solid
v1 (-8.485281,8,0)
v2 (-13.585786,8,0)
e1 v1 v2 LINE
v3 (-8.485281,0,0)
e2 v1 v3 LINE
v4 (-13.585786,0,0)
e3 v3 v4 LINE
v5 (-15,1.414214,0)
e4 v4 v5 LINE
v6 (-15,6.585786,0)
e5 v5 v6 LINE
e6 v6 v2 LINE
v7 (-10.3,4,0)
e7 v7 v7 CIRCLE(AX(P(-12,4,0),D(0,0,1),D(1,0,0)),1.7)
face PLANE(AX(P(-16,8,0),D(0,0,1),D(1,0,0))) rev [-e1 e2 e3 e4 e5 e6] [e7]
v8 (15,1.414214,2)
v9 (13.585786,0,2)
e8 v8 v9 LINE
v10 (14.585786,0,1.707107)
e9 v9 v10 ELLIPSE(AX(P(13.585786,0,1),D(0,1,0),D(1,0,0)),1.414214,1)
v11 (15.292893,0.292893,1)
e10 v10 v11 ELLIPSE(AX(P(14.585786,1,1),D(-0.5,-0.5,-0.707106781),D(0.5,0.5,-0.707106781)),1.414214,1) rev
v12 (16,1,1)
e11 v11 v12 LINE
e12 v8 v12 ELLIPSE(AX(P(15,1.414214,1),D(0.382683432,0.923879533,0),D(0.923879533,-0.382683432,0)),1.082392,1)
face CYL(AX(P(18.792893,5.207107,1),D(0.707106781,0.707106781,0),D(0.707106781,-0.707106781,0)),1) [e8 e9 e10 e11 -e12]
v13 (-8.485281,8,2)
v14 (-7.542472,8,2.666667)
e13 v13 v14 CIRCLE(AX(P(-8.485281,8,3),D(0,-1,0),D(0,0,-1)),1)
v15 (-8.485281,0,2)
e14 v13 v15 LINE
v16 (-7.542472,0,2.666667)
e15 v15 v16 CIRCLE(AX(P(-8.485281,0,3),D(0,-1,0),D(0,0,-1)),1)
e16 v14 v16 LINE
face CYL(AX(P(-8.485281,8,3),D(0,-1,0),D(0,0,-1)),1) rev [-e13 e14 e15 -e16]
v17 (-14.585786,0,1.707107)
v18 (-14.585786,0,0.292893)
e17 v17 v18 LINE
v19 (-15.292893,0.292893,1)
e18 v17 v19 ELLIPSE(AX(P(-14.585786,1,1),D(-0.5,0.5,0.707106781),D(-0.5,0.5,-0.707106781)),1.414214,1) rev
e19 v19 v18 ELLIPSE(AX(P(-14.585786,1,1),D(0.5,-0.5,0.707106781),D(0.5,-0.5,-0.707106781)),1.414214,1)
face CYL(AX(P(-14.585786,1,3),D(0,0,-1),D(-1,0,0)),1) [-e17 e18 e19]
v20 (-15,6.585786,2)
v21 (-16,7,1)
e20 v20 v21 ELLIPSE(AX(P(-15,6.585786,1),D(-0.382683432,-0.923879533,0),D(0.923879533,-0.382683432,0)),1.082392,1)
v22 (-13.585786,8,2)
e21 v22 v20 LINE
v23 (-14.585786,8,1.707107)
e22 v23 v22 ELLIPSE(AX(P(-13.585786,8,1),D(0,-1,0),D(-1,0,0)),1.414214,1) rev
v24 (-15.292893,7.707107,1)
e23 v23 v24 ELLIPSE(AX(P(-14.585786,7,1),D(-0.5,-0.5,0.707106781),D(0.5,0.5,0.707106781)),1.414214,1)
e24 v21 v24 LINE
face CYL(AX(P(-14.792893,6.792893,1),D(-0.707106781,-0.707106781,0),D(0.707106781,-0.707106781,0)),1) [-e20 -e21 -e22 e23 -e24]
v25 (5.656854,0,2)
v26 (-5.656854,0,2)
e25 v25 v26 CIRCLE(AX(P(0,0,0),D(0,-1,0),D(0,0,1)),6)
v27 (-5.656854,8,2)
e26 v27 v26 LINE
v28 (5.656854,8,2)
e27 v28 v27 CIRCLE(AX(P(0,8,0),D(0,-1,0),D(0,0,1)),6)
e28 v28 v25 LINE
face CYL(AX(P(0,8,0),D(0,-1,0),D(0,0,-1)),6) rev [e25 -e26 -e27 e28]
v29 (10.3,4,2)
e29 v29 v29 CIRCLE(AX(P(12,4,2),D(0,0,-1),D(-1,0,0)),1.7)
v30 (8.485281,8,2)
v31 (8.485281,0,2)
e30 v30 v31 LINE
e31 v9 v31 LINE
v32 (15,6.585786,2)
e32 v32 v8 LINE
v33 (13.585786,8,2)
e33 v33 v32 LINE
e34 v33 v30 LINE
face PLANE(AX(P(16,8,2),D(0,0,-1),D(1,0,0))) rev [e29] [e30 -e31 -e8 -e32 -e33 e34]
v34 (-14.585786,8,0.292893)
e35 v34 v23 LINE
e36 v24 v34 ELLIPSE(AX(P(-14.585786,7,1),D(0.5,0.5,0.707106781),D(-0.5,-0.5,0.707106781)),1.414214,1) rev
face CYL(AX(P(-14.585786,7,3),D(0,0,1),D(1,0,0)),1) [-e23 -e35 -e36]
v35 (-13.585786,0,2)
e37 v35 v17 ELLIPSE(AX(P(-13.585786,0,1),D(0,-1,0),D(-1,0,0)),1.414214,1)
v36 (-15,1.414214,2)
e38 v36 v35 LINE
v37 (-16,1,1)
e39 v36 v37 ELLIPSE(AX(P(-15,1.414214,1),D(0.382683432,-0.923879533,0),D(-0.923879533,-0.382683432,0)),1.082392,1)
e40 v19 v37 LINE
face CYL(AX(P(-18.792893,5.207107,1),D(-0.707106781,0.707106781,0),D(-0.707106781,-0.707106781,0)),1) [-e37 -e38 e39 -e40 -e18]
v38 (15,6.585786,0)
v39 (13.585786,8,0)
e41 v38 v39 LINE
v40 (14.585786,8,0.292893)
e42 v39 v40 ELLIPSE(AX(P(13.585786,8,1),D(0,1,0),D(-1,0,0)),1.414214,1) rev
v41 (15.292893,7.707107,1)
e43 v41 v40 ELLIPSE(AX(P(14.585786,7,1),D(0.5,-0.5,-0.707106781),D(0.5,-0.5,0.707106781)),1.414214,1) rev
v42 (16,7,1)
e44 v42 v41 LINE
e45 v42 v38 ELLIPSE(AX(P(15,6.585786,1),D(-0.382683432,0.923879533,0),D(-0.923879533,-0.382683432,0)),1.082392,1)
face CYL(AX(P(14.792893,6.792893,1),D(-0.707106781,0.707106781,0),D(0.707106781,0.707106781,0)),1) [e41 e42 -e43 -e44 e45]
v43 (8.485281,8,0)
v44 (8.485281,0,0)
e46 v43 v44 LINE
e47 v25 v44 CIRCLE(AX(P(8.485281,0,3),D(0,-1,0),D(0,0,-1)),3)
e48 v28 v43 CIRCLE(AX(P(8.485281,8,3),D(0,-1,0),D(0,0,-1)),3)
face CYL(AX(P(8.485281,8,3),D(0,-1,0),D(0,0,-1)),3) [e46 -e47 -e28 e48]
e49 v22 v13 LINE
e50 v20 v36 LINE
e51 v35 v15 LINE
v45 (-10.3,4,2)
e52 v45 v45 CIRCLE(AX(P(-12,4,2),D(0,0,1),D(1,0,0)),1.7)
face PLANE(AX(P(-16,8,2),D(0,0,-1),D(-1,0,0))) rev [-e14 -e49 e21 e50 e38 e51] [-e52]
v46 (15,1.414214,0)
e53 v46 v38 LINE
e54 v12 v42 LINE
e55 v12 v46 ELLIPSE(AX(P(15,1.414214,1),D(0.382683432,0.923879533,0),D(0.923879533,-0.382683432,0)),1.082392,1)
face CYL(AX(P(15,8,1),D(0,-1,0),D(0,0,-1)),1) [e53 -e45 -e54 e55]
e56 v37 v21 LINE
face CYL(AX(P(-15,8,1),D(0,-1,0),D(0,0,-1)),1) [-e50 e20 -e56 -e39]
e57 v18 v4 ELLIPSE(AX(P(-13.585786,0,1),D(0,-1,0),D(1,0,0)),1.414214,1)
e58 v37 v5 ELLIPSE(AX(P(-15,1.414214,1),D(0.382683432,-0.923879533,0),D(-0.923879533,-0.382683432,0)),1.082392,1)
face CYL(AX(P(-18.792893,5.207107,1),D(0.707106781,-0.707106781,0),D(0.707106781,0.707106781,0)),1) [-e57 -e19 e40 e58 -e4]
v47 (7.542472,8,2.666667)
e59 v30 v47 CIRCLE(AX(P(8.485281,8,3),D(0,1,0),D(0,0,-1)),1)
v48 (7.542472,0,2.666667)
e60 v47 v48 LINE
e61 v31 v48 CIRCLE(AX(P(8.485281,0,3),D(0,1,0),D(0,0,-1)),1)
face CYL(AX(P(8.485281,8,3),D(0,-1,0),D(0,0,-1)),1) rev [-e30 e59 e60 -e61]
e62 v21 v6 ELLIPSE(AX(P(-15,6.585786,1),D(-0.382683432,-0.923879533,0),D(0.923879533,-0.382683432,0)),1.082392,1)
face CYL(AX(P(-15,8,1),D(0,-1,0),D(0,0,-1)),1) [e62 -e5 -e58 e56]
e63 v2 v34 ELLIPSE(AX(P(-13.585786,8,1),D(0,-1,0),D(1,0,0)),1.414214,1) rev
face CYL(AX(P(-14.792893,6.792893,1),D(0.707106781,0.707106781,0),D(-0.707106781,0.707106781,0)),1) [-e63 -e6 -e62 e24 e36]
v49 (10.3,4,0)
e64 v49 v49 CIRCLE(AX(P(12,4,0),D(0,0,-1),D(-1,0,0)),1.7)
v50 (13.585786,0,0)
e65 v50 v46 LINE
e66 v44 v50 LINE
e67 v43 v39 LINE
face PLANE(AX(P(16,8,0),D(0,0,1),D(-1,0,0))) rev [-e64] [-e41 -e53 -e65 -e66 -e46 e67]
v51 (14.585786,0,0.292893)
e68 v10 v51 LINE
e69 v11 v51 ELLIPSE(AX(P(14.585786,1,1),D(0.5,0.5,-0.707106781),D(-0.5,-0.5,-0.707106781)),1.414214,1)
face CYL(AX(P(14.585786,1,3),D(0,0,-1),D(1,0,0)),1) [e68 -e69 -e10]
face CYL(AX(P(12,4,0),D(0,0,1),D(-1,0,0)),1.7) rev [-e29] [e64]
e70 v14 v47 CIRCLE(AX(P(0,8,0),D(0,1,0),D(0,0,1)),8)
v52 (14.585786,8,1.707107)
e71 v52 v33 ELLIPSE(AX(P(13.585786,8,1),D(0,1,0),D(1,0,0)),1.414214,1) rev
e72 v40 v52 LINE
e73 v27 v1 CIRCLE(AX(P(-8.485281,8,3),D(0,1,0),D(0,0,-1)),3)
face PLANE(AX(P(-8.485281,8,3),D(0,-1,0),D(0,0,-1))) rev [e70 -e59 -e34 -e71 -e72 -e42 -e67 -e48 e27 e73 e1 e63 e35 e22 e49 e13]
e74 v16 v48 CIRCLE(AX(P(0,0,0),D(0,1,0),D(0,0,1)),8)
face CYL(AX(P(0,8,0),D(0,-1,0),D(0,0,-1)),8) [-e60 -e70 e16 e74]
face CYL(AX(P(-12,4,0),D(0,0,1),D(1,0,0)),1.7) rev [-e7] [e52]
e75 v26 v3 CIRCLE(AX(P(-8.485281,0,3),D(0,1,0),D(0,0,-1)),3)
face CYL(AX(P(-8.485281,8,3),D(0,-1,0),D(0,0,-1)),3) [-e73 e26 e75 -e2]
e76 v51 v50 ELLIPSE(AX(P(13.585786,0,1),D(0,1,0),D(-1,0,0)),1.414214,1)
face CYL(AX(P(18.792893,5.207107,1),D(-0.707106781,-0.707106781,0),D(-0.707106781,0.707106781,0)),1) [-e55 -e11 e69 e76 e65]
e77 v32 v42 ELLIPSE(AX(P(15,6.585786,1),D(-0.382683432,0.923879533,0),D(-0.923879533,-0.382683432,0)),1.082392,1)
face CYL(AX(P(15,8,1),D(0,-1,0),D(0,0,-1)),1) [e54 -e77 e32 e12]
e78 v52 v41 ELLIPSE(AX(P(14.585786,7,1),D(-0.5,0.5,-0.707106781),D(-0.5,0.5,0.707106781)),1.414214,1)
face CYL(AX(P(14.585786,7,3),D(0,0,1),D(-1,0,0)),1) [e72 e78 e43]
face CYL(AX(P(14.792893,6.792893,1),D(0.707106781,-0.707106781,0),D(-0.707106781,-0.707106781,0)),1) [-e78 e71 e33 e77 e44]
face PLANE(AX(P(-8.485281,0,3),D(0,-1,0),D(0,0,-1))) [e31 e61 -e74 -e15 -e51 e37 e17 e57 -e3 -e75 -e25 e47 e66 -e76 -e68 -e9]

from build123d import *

# Parameters (mm, degrees)
BOSS_EXTRUDE1_DEPTH = 8
SKETCH2_R           = 1.7
CUT_EXTRUDE1_DEPTH  = 19.867962264
CHAMFER1_SIZE       = 1
FILLET1_R           = 1


with BuildPart() as part:
    # Sketch1 → Boss-Extrude1 (new body)
    with BuildSketch(Plane(origin=(0, 0, 0), x_dir=(1, 0, 0), z_dir=(0, 1, 0))):
        with BuildLine():
            Line((-16, 0), (-8.485281374, 0))
            ThreePointArc((-8.485281374, 0), (-6.753230567, -0.550510257), (-5.656854249, -2))
            ThreePointArc((-5.656854249, -2), (-3.464101615, -4.898979486), (0, -6))
            Line((0, -6), (0, -8))
            ThreePointArc((0, -8), (-4.618802154, -6.531972647), (-7.542472333, -2.666666667))
            ThreePointArc((-7.542472333, -2.666666667), (-7.907931105, -2.183503419), (-8.485281374, -2))
            Line((-8.485281374, -2), (-16, -2))
            Line((-16, -2), (-16, 0))
        make_face()
    extrude(amount=BOSS_EXTRUDE1_DEPTH)

    # Sketch2 → Cut-Extrude1 (cut, through all)
    with BuildSketch(Plane.XY.offset(2)):
        with Locations((-12, 4)):
            Circle(SKETCH2_R)
    extrude(amount=-CUT_EXTRUDE1_DEPTH, mode=Mode.SUBTRACT)

    # Chamfer1
    chamfer1_edges = [part.edges().sort_by_distance(p)[0] for p in [
        (-16, 0, 1),
        (-16, 8, 1),
    ]]
    chamfer(chamfer1_edges, length=CHAMFER1_SIZE)

    # Fillet1
    fillet1_edges = [part.edges().sort_by_distance(p)[0] for p in [
        (-16, 4, 0),
        (-16, 4, 2),
        (-15.5, 0.5, 0),
        (-15.5, 0.5, 2),
        (-15.5, 7.5, 0),
        (-15.5, 7.5, 2),
        (-15, 8, 1),
        (-15, 0, 1),
    ]]
    fillet(fillet1_edges, radius=FILLET1_R - 0.0001)  # a hair under: the kernel refuses the full size

    # Mirror1: part across plane


with BuildPart() as part_1:
    add(part.part)
    add(part.part.mirror(Plane(origin=(0, 8, 6), x_dir=(0, 0, 1), z_dir=(-1, 0, 0))))


solid = part_1.part
